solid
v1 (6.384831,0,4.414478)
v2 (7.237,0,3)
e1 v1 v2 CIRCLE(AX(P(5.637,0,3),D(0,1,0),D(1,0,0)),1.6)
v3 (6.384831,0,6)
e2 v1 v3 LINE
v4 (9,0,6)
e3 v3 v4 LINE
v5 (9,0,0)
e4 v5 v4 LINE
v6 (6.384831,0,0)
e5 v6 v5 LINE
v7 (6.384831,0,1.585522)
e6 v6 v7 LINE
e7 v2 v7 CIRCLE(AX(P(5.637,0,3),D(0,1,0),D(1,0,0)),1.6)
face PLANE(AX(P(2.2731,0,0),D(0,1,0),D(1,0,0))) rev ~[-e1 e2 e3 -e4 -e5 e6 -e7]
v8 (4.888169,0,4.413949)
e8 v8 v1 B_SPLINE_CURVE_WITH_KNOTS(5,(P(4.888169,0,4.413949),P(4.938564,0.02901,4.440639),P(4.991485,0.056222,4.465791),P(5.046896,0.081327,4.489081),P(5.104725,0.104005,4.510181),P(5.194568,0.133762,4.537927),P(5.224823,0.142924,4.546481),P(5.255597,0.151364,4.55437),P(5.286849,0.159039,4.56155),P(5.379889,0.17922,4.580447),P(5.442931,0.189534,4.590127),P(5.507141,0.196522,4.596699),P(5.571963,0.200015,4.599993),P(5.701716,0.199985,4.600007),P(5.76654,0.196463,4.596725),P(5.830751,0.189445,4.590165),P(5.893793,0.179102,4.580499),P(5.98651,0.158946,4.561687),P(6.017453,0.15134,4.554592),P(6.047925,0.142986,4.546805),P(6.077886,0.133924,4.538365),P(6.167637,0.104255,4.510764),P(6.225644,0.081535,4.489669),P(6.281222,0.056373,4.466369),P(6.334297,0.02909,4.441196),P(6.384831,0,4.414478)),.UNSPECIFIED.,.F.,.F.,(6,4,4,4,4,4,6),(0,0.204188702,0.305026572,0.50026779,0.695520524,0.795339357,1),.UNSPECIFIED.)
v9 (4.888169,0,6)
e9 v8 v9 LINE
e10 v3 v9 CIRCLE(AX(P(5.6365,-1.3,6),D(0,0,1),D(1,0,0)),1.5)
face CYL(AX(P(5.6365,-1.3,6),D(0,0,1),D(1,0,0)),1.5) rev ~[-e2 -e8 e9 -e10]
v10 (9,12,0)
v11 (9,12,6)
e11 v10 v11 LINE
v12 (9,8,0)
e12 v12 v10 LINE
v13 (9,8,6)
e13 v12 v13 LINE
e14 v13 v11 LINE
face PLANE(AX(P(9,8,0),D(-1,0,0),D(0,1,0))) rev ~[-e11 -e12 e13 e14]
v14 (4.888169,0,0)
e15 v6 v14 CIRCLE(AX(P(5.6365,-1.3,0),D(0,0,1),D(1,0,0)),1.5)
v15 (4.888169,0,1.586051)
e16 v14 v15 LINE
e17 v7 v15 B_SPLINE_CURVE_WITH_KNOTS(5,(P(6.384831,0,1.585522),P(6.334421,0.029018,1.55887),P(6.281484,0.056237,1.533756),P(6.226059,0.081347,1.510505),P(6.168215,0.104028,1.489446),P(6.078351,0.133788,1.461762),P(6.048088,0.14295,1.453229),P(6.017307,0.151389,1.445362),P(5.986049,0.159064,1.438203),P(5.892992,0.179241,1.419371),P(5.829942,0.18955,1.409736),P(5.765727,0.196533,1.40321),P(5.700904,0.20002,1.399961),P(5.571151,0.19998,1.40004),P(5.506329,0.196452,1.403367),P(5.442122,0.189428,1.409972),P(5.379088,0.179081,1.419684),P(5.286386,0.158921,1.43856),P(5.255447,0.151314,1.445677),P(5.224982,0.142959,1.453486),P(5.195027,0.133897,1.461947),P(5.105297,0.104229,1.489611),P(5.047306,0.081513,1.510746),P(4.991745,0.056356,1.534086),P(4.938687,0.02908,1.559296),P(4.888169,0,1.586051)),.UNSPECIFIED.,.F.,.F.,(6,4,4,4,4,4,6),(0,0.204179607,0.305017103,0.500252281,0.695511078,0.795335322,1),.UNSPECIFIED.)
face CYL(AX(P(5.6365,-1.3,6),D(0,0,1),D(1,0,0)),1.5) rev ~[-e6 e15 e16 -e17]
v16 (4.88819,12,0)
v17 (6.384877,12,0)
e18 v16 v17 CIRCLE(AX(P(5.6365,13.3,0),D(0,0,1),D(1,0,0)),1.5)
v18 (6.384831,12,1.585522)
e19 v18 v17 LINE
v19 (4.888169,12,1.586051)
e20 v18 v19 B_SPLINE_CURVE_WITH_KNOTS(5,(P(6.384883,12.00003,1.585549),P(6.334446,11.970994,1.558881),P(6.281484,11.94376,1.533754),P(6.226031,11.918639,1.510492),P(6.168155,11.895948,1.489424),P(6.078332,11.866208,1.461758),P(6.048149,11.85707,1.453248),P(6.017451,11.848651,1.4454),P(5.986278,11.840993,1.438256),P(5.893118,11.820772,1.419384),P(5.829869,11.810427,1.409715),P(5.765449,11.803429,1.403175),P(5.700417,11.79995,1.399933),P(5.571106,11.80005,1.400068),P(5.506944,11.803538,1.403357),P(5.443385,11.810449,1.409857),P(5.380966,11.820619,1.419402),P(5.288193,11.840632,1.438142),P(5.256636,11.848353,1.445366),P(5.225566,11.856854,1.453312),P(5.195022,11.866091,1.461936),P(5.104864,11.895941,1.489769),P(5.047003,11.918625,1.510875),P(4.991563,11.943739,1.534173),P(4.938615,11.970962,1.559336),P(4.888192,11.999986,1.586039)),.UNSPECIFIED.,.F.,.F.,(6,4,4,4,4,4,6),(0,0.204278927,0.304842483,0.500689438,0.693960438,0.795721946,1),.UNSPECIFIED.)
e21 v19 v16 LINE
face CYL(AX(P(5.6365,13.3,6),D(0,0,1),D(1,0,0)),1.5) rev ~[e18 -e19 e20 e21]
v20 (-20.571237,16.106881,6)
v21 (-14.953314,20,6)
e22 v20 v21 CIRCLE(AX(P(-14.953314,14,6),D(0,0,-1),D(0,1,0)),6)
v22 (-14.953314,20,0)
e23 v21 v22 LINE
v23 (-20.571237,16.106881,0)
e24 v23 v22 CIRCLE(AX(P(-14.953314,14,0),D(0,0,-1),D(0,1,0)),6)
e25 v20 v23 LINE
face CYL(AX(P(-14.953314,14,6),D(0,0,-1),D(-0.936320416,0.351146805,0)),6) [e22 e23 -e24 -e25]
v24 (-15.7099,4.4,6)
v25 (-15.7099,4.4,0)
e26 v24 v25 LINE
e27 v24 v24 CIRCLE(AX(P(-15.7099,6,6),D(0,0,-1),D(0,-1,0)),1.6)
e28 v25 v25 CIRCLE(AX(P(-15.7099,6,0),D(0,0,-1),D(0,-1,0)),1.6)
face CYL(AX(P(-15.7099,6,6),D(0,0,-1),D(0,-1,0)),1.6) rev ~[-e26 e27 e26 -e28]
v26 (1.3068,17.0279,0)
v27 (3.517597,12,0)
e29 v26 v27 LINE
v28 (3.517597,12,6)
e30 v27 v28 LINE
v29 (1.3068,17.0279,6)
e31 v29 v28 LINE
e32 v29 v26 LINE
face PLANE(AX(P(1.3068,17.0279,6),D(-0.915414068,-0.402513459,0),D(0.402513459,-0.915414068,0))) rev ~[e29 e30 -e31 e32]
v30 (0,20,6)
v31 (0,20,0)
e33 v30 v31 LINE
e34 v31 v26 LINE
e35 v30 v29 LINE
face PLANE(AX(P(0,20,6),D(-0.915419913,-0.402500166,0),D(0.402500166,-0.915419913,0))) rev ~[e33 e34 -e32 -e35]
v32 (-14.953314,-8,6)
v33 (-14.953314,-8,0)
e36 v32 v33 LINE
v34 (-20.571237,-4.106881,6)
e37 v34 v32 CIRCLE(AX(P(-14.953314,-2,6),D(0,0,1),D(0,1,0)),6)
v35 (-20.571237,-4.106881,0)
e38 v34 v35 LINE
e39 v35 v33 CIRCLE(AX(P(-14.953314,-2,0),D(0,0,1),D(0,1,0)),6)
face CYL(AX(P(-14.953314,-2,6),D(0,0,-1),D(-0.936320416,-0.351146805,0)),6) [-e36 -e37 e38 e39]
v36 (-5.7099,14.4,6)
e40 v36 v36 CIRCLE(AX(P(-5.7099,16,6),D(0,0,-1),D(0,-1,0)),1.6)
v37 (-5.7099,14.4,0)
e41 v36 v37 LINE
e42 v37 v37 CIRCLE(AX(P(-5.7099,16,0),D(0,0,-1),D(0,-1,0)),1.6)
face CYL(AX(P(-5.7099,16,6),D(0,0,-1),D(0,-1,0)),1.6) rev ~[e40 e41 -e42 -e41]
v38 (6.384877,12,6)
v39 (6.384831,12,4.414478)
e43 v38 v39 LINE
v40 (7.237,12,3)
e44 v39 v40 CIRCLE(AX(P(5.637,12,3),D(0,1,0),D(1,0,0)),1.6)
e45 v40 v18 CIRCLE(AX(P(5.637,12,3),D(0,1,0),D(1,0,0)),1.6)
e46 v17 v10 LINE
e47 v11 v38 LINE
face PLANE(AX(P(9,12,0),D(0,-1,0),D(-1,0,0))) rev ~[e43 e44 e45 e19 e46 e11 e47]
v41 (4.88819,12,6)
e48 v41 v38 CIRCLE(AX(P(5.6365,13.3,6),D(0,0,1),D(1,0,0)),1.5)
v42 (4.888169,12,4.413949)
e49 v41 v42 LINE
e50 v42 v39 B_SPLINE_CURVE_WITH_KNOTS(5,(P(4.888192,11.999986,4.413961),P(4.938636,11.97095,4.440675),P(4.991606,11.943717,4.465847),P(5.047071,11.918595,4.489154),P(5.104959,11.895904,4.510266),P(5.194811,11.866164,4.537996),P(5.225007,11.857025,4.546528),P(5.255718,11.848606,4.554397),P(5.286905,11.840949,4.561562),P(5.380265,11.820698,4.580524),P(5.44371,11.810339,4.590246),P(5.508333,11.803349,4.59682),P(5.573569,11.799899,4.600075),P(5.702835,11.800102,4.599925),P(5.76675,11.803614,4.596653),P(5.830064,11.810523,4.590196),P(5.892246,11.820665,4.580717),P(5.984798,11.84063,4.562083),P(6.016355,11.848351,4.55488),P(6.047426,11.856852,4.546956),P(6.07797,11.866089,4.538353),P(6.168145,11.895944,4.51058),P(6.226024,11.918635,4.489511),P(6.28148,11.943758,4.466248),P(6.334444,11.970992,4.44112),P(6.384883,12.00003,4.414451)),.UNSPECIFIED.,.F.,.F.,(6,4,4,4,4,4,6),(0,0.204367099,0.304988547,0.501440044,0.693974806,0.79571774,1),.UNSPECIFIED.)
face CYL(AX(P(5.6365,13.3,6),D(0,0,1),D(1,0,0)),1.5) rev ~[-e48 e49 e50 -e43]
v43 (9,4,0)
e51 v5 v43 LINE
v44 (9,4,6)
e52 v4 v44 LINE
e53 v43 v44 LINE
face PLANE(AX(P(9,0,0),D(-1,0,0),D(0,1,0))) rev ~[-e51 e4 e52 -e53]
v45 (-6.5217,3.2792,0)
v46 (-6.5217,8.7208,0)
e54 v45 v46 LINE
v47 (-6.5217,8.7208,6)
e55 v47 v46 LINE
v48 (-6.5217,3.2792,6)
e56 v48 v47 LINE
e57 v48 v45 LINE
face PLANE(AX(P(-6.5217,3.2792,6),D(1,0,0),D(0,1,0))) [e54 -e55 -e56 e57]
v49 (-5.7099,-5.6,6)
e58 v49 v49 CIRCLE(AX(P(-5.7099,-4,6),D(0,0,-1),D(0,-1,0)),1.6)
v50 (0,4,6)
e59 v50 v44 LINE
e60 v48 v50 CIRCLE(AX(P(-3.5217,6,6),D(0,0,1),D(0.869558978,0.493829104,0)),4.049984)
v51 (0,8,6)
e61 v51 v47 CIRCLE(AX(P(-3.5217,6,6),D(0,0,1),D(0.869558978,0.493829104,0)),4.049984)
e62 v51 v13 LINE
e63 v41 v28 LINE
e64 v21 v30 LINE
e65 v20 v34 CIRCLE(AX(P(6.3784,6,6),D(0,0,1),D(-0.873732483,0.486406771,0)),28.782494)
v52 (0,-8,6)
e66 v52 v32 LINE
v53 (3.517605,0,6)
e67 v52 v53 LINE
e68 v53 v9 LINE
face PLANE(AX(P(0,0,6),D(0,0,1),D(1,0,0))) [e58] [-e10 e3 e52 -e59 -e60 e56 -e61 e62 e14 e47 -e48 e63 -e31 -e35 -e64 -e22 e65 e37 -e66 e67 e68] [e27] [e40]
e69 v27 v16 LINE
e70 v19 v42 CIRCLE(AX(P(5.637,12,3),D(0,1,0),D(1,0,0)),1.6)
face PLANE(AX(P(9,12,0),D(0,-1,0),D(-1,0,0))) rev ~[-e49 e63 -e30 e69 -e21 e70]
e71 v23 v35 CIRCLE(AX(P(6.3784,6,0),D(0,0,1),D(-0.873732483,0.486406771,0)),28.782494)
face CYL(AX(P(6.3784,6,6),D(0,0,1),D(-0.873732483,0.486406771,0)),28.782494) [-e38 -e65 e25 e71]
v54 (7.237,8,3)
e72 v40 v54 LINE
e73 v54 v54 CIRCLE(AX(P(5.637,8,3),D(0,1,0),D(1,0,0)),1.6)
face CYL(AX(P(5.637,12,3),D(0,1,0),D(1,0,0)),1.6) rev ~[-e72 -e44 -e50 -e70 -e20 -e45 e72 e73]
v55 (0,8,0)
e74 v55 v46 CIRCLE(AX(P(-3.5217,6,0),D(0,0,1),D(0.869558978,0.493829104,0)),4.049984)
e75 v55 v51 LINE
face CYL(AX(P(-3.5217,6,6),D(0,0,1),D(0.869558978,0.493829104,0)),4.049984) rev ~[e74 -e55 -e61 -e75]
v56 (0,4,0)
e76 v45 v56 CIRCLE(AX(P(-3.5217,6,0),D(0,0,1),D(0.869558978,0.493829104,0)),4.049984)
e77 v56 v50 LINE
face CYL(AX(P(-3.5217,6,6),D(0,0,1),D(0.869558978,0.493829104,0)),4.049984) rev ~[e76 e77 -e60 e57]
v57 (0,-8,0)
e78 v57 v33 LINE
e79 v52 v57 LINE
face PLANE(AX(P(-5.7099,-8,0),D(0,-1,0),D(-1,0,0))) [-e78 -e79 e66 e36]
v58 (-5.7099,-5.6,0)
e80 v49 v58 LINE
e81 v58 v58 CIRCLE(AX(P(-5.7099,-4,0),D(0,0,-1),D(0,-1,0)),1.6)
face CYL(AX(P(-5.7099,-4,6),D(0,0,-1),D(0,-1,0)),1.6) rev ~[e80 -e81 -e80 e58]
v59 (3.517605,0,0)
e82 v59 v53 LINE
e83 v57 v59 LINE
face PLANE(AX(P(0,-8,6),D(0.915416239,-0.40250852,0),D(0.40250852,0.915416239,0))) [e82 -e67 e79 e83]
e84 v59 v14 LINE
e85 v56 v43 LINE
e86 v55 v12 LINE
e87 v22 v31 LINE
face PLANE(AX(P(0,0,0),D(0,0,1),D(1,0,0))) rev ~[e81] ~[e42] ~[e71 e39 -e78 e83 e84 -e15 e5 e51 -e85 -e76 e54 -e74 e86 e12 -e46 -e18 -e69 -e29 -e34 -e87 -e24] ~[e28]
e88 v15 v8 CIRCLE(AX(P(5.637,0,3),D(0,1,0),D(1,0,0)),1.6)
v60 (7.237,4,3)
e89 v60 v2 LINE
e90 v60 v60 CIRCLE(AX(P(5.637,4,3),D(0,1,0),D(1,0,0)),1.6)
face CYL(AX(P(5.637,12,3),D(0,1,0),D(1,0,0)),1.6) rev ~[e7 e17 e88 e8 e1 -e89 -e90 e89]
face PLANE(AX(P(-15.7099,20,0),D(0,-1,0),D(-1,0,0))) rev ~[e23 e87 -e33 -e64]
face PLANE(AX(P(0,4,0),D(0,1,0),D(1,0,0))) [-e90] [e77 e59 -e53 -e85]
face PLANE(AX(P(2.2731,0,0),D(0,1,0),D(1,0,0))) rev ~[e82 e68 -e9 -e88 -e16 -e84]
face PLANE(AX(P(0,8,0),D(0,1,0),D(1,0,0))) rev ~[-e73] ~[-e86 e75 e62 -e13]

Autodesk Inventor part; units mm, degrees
ref_plane "YZ Plane" through (0, 0, 0) normal (1, 0, 0) x (0, 1, 0)
ref_plane "XZ Plane" through (0, 0, 0) normal (0, 1, 0) x (-1, 0, 0)
ref_plane "XY Plane" through (0, 0, 0) normal (0, 0, 1) x (1, 0, 0)
sketch "スケッチ1" plane through (0, 0, 0) normal (0, 0, 1) x (1, 0, 0)
  line L0 (9, 0) -> (9, 4)
  line L1 (9, 12) -> (2.2731, 12)
  line L2 (0, 8) -> (9, 8)
  line L3 (0, 4) -> (9, 4)
  line L4 (9, 8) -> (9, 12)
  arc A0 (0, 8) -> (0, 4) centre (-5.7099, 6) ccw
  line L5 (2.2731, 12) -> (0, 14.2779)
  line L6 (2.2731, 0) -> (-5.7099, -8)
  line L7 (-5.7099, 20) -> (-15.7099, 20)
  line L8 (-5.7099, -8) -> (-15.7099, -8)
  line L9 (-15.7099, 20) -> (-25.7698, 20)
  line L10 (-25.7698, 20) -> (-25.7698, -8)
  line L11 (-25.7698, -8) -> (-15.7099, -8)
  line L12 (2.2731, 0) -> (9, 0)
  line L13 (0, 14.2779) -> (-5.7099, 20)
  point P0 (0, 0)
  point P1 (4.5, 12)
  point P2 (4.5, 0)
  point P3 (4.5, 4)
  point P4 (-25.7099, 6)
  dimension "d4" = 12.1
  dimension "d5" = 4
  dimension "d6" = 14
  dimension "d7" = 14
  dimension "d8" = 10
  dimension "d9" = 10
  dimension "d10" = 20
  dimension "d12" = 14
extrude "押し出し1" add sketch "スケッチ1" along normal blind 6
sketch "スケッチ2" plane through (0, 0, 6) normal (0, 0, 1) x (1, 0, 0)
  circle A0 centre (5.6365, 13.3) radius 1.5
  line L0 (9, 8) -> (9, 12) projected
  line L1 (11.5477, 6) -> (-28.1936, 6) construction
  line L2 (9, 12) -> (2.2731, 12) projected
  circle A1 centre (5.6365, -1.3) radius 1.5
  point P0 (0, 0)
  point P1 (4.8882, 12)
  point P2 (6.3849, 12)
  dimension "d15" = 3
  dimension "d16" = 3.3635
  dimension "d17" = 1.3
extrude "押し出し2" cut sketch "スケッチ2" against normal blind 6 contours A0 L2 | A1 picked at (5.4614, 13.0013)
sketch "スケッチ3" plane through (0, 0, 6) normal (0, 0, 1) x (1, 0, 0)
  circle A0 centre (5.6365, 13.3) radius 1.5
  line L0 (9, 12) -> (2.2731, 12) projected
  point P0 (0, 0)
  point P1 (4.8882, 12)
  point P2 (6.3849, 12)
  dimension "d20" = 3
  dimension "d21" = 1.3
extrude "押し出し3" add sketch "スケッチ3" against normal blind 6 contours A0 L0 picked at (5.4614, 13.0013)
sketch "スケッチ4" plane through (0, 0, 6) normal (0, 0, 1) x (1, 0, 0)
  arc A0 (6.3849, 12) -> (4.8882, 12) centre (5.6365, 13.3) ccw projected
  circle A1 centre (5.6365, 13.3) radius 1.5
  point P0 (0, 0)
  dimension "d24" = 3
extrude "押し出し4" cut sketch "スケッチ4" against normal blind 6
fillet "フィレット1" radius 5 1 edges at (-25.7698, 20, 3)
fillet "フィレット2" radius 5 1 edges at (-25.7698, -8, 3)
fillet "フィレット3" radius 3 4 edges at (-5.7099, -8, 3) (2.2731, 0, 3) (-5.7099, 20, 3) (2.2731, 12, 3)
sketch "スケッチ6" plane through (0, 4, 0) normal (0, 1, 0) x (1, 0, 0)
  point P0 (0, 0)
sketch "スケッチ7" plane through (4.8882, 12, 6) normal (0, 1, 0) x (1, 0, 0)
  circle A0 centre (0.7488, 3) radius 1.6
  line L0 (1.4967, 0) -> (0, 0) projected
  line L1 (4.1118, 6) -> (4.1118, 0) projected
  point P0 (-4.8882, 6)
  point P1 (0.7483, 0)
  dimension "d43" = 3.2
  dimension "d44" = 3
  dimension "d45" = 3.363
extrude "押し出し5" cut sketch "スケッチ7" against normal blind 28
sketch "スケッチ11" plane through (0, 0, 6) normal (0, 0, 1) x (1, 0, 0)
  line L0 (-6.9544, 20) -> (-20.7698, 20) projected
  line L1 (-20.7698, 20) -> (-6.9544, 20)
  arc A0 (1.394, 12.8809) -> (3.5176, 12) centre (3.5176, 15) ccw projected
  line L2 (0, 20) -> (1.3068, 17.0279)
  arc A1 (1.394, 12.8809) -> (3.5176, 12) centre (3.5176, 15) ccw
  arc A2 (-4.8308, 19.1191) -> (-6.9544, 20) centre (-6.9544, 17) ccw projected
  arc A3 (-4.8308, 19.1191) -> (-6.9544, 20) centre (-6.9544, 17) ccw
  line L3 (1.394, 12.8809) -> (-4.8308, 19.1191) projected
  line L4 (-4.8308, 19.1191) -> (1.394, 12.8809)
  arc A4 (0, 8) -> (0, 4) centre (-5.7099, 6) ccw projected
  line L5 (-11.7599, 6) -> (12.1155, 6) construction
  line L6 (-20.7698, -8) -> (0, -8)
  line L7 (0, -8) -> (3.5176, 0)
  arc A5 (-6.9544, -8) -> (-4.8308, -7.1191) centre (-6.9544, -5) ccw
  line L8 (1.394, -0.8809) -> (-4.8308, -7.1191)
  line L9 (-6.9544, 20) -> (0, 20)
  line L10 (1.3068, 17.0279) -> (3.5176, 12)
  arc A6 (3.5176, 0) -> (1.394, -0.8809) centre (3.5176, -3) ccw
  point P0 (0, 0)
extrude "押し出し6" add sketch "スケッチ11" against normal blind 6
sketch "スケッチ12" plane through (0, 0, 6) normal (0, 0, 1) x (1, 0, 0)
  arc A0 (0, 8) -> (0, 4) centre (-5.7099, 6) ccw projected
  point P0 (0, 0)
  point P1 (-15.7099, 6)
  point P2 (-5.7099, 16)
  point P3 (-5.7099, -4)
  dimension "d74" = 10
  dimension "d76" = 10
  dimension "d77" = 10
hole "穴4" at (-15.7099, 6, 6) at (-5.7099, 16, 6) at (-5.7099, -4, 6) direction (0, 0, -1) diameter 3.2 end through all
sketch "スケッチ13" plane through (0, 0, 6) normal (0, 0, 1) x (1, 0, 0)
  line L0 (-20.7698, -8) -> (0, -8) projected
  line L1 (0, 20) -> (-20.7698, 20) projected
  line L2 (-18.7698, 20) -> (-18.7698, -8) construction
  line L3 (-25.7698, 15) -> (-25.7698, -3) projected
  arc A0 (-18.7698, 20) -> (-18.7698, -8) centre (6.3784, 6) ccw
  line L4 (-18.7698, 20) -> (-29.3351, 20)
  line L5 (-29.3351, 20) -> (-29.3351, -8)
  line L6 (-29.3351, -8) -> (-18.7698, -8)
  point P0 (0, 0)
  dimension "d85" = 7
extrude "押し出し7" cut sketch "スケッチ13" against normal blind 6
fillet "フィレット4" radius 6 1 edges at (-18.7698, 20, 3)
fillet "フィレット5" radius 6 1 edges at (-18.7698, -8, 3)
sketch "スケッチ14" plane through (0, 0, 6) normal (0, 0, 1) x (1, 0, 0)
  arc A0 (0, 8) -> (0, 4) centre (-3.5217, 6) ccw
  arc A1 (0, 8) -> (0, 4) centre (-5.7099, 6) ccw projected
  point P0 (0, 0)
  point P1 (0, 4)
  dimension "d90" = 8.1
extrude "押し出し8" add sketch "スケッチ14" against normal blind 6
sketch "スケッチ15" plane through (0, 0, 6) normal (0, 0, 1) x (1, 0, 0)
  arc A0 (0, 8) -> (0, 4) centre (-3.5217, 6) ccw projected
  line L0 (-6.5217, 3.2792) -> (-6.5217, 8.7208)
  point P0 (0, 0)
  point P1 (-6.5217, 6)
  dimension "d93" = 3
extrude "押し出し9" add sketch "スケッチ15" against normal blind 6
properties part number "射出_腕固定3" material "ポリカーボネート、クリア"
